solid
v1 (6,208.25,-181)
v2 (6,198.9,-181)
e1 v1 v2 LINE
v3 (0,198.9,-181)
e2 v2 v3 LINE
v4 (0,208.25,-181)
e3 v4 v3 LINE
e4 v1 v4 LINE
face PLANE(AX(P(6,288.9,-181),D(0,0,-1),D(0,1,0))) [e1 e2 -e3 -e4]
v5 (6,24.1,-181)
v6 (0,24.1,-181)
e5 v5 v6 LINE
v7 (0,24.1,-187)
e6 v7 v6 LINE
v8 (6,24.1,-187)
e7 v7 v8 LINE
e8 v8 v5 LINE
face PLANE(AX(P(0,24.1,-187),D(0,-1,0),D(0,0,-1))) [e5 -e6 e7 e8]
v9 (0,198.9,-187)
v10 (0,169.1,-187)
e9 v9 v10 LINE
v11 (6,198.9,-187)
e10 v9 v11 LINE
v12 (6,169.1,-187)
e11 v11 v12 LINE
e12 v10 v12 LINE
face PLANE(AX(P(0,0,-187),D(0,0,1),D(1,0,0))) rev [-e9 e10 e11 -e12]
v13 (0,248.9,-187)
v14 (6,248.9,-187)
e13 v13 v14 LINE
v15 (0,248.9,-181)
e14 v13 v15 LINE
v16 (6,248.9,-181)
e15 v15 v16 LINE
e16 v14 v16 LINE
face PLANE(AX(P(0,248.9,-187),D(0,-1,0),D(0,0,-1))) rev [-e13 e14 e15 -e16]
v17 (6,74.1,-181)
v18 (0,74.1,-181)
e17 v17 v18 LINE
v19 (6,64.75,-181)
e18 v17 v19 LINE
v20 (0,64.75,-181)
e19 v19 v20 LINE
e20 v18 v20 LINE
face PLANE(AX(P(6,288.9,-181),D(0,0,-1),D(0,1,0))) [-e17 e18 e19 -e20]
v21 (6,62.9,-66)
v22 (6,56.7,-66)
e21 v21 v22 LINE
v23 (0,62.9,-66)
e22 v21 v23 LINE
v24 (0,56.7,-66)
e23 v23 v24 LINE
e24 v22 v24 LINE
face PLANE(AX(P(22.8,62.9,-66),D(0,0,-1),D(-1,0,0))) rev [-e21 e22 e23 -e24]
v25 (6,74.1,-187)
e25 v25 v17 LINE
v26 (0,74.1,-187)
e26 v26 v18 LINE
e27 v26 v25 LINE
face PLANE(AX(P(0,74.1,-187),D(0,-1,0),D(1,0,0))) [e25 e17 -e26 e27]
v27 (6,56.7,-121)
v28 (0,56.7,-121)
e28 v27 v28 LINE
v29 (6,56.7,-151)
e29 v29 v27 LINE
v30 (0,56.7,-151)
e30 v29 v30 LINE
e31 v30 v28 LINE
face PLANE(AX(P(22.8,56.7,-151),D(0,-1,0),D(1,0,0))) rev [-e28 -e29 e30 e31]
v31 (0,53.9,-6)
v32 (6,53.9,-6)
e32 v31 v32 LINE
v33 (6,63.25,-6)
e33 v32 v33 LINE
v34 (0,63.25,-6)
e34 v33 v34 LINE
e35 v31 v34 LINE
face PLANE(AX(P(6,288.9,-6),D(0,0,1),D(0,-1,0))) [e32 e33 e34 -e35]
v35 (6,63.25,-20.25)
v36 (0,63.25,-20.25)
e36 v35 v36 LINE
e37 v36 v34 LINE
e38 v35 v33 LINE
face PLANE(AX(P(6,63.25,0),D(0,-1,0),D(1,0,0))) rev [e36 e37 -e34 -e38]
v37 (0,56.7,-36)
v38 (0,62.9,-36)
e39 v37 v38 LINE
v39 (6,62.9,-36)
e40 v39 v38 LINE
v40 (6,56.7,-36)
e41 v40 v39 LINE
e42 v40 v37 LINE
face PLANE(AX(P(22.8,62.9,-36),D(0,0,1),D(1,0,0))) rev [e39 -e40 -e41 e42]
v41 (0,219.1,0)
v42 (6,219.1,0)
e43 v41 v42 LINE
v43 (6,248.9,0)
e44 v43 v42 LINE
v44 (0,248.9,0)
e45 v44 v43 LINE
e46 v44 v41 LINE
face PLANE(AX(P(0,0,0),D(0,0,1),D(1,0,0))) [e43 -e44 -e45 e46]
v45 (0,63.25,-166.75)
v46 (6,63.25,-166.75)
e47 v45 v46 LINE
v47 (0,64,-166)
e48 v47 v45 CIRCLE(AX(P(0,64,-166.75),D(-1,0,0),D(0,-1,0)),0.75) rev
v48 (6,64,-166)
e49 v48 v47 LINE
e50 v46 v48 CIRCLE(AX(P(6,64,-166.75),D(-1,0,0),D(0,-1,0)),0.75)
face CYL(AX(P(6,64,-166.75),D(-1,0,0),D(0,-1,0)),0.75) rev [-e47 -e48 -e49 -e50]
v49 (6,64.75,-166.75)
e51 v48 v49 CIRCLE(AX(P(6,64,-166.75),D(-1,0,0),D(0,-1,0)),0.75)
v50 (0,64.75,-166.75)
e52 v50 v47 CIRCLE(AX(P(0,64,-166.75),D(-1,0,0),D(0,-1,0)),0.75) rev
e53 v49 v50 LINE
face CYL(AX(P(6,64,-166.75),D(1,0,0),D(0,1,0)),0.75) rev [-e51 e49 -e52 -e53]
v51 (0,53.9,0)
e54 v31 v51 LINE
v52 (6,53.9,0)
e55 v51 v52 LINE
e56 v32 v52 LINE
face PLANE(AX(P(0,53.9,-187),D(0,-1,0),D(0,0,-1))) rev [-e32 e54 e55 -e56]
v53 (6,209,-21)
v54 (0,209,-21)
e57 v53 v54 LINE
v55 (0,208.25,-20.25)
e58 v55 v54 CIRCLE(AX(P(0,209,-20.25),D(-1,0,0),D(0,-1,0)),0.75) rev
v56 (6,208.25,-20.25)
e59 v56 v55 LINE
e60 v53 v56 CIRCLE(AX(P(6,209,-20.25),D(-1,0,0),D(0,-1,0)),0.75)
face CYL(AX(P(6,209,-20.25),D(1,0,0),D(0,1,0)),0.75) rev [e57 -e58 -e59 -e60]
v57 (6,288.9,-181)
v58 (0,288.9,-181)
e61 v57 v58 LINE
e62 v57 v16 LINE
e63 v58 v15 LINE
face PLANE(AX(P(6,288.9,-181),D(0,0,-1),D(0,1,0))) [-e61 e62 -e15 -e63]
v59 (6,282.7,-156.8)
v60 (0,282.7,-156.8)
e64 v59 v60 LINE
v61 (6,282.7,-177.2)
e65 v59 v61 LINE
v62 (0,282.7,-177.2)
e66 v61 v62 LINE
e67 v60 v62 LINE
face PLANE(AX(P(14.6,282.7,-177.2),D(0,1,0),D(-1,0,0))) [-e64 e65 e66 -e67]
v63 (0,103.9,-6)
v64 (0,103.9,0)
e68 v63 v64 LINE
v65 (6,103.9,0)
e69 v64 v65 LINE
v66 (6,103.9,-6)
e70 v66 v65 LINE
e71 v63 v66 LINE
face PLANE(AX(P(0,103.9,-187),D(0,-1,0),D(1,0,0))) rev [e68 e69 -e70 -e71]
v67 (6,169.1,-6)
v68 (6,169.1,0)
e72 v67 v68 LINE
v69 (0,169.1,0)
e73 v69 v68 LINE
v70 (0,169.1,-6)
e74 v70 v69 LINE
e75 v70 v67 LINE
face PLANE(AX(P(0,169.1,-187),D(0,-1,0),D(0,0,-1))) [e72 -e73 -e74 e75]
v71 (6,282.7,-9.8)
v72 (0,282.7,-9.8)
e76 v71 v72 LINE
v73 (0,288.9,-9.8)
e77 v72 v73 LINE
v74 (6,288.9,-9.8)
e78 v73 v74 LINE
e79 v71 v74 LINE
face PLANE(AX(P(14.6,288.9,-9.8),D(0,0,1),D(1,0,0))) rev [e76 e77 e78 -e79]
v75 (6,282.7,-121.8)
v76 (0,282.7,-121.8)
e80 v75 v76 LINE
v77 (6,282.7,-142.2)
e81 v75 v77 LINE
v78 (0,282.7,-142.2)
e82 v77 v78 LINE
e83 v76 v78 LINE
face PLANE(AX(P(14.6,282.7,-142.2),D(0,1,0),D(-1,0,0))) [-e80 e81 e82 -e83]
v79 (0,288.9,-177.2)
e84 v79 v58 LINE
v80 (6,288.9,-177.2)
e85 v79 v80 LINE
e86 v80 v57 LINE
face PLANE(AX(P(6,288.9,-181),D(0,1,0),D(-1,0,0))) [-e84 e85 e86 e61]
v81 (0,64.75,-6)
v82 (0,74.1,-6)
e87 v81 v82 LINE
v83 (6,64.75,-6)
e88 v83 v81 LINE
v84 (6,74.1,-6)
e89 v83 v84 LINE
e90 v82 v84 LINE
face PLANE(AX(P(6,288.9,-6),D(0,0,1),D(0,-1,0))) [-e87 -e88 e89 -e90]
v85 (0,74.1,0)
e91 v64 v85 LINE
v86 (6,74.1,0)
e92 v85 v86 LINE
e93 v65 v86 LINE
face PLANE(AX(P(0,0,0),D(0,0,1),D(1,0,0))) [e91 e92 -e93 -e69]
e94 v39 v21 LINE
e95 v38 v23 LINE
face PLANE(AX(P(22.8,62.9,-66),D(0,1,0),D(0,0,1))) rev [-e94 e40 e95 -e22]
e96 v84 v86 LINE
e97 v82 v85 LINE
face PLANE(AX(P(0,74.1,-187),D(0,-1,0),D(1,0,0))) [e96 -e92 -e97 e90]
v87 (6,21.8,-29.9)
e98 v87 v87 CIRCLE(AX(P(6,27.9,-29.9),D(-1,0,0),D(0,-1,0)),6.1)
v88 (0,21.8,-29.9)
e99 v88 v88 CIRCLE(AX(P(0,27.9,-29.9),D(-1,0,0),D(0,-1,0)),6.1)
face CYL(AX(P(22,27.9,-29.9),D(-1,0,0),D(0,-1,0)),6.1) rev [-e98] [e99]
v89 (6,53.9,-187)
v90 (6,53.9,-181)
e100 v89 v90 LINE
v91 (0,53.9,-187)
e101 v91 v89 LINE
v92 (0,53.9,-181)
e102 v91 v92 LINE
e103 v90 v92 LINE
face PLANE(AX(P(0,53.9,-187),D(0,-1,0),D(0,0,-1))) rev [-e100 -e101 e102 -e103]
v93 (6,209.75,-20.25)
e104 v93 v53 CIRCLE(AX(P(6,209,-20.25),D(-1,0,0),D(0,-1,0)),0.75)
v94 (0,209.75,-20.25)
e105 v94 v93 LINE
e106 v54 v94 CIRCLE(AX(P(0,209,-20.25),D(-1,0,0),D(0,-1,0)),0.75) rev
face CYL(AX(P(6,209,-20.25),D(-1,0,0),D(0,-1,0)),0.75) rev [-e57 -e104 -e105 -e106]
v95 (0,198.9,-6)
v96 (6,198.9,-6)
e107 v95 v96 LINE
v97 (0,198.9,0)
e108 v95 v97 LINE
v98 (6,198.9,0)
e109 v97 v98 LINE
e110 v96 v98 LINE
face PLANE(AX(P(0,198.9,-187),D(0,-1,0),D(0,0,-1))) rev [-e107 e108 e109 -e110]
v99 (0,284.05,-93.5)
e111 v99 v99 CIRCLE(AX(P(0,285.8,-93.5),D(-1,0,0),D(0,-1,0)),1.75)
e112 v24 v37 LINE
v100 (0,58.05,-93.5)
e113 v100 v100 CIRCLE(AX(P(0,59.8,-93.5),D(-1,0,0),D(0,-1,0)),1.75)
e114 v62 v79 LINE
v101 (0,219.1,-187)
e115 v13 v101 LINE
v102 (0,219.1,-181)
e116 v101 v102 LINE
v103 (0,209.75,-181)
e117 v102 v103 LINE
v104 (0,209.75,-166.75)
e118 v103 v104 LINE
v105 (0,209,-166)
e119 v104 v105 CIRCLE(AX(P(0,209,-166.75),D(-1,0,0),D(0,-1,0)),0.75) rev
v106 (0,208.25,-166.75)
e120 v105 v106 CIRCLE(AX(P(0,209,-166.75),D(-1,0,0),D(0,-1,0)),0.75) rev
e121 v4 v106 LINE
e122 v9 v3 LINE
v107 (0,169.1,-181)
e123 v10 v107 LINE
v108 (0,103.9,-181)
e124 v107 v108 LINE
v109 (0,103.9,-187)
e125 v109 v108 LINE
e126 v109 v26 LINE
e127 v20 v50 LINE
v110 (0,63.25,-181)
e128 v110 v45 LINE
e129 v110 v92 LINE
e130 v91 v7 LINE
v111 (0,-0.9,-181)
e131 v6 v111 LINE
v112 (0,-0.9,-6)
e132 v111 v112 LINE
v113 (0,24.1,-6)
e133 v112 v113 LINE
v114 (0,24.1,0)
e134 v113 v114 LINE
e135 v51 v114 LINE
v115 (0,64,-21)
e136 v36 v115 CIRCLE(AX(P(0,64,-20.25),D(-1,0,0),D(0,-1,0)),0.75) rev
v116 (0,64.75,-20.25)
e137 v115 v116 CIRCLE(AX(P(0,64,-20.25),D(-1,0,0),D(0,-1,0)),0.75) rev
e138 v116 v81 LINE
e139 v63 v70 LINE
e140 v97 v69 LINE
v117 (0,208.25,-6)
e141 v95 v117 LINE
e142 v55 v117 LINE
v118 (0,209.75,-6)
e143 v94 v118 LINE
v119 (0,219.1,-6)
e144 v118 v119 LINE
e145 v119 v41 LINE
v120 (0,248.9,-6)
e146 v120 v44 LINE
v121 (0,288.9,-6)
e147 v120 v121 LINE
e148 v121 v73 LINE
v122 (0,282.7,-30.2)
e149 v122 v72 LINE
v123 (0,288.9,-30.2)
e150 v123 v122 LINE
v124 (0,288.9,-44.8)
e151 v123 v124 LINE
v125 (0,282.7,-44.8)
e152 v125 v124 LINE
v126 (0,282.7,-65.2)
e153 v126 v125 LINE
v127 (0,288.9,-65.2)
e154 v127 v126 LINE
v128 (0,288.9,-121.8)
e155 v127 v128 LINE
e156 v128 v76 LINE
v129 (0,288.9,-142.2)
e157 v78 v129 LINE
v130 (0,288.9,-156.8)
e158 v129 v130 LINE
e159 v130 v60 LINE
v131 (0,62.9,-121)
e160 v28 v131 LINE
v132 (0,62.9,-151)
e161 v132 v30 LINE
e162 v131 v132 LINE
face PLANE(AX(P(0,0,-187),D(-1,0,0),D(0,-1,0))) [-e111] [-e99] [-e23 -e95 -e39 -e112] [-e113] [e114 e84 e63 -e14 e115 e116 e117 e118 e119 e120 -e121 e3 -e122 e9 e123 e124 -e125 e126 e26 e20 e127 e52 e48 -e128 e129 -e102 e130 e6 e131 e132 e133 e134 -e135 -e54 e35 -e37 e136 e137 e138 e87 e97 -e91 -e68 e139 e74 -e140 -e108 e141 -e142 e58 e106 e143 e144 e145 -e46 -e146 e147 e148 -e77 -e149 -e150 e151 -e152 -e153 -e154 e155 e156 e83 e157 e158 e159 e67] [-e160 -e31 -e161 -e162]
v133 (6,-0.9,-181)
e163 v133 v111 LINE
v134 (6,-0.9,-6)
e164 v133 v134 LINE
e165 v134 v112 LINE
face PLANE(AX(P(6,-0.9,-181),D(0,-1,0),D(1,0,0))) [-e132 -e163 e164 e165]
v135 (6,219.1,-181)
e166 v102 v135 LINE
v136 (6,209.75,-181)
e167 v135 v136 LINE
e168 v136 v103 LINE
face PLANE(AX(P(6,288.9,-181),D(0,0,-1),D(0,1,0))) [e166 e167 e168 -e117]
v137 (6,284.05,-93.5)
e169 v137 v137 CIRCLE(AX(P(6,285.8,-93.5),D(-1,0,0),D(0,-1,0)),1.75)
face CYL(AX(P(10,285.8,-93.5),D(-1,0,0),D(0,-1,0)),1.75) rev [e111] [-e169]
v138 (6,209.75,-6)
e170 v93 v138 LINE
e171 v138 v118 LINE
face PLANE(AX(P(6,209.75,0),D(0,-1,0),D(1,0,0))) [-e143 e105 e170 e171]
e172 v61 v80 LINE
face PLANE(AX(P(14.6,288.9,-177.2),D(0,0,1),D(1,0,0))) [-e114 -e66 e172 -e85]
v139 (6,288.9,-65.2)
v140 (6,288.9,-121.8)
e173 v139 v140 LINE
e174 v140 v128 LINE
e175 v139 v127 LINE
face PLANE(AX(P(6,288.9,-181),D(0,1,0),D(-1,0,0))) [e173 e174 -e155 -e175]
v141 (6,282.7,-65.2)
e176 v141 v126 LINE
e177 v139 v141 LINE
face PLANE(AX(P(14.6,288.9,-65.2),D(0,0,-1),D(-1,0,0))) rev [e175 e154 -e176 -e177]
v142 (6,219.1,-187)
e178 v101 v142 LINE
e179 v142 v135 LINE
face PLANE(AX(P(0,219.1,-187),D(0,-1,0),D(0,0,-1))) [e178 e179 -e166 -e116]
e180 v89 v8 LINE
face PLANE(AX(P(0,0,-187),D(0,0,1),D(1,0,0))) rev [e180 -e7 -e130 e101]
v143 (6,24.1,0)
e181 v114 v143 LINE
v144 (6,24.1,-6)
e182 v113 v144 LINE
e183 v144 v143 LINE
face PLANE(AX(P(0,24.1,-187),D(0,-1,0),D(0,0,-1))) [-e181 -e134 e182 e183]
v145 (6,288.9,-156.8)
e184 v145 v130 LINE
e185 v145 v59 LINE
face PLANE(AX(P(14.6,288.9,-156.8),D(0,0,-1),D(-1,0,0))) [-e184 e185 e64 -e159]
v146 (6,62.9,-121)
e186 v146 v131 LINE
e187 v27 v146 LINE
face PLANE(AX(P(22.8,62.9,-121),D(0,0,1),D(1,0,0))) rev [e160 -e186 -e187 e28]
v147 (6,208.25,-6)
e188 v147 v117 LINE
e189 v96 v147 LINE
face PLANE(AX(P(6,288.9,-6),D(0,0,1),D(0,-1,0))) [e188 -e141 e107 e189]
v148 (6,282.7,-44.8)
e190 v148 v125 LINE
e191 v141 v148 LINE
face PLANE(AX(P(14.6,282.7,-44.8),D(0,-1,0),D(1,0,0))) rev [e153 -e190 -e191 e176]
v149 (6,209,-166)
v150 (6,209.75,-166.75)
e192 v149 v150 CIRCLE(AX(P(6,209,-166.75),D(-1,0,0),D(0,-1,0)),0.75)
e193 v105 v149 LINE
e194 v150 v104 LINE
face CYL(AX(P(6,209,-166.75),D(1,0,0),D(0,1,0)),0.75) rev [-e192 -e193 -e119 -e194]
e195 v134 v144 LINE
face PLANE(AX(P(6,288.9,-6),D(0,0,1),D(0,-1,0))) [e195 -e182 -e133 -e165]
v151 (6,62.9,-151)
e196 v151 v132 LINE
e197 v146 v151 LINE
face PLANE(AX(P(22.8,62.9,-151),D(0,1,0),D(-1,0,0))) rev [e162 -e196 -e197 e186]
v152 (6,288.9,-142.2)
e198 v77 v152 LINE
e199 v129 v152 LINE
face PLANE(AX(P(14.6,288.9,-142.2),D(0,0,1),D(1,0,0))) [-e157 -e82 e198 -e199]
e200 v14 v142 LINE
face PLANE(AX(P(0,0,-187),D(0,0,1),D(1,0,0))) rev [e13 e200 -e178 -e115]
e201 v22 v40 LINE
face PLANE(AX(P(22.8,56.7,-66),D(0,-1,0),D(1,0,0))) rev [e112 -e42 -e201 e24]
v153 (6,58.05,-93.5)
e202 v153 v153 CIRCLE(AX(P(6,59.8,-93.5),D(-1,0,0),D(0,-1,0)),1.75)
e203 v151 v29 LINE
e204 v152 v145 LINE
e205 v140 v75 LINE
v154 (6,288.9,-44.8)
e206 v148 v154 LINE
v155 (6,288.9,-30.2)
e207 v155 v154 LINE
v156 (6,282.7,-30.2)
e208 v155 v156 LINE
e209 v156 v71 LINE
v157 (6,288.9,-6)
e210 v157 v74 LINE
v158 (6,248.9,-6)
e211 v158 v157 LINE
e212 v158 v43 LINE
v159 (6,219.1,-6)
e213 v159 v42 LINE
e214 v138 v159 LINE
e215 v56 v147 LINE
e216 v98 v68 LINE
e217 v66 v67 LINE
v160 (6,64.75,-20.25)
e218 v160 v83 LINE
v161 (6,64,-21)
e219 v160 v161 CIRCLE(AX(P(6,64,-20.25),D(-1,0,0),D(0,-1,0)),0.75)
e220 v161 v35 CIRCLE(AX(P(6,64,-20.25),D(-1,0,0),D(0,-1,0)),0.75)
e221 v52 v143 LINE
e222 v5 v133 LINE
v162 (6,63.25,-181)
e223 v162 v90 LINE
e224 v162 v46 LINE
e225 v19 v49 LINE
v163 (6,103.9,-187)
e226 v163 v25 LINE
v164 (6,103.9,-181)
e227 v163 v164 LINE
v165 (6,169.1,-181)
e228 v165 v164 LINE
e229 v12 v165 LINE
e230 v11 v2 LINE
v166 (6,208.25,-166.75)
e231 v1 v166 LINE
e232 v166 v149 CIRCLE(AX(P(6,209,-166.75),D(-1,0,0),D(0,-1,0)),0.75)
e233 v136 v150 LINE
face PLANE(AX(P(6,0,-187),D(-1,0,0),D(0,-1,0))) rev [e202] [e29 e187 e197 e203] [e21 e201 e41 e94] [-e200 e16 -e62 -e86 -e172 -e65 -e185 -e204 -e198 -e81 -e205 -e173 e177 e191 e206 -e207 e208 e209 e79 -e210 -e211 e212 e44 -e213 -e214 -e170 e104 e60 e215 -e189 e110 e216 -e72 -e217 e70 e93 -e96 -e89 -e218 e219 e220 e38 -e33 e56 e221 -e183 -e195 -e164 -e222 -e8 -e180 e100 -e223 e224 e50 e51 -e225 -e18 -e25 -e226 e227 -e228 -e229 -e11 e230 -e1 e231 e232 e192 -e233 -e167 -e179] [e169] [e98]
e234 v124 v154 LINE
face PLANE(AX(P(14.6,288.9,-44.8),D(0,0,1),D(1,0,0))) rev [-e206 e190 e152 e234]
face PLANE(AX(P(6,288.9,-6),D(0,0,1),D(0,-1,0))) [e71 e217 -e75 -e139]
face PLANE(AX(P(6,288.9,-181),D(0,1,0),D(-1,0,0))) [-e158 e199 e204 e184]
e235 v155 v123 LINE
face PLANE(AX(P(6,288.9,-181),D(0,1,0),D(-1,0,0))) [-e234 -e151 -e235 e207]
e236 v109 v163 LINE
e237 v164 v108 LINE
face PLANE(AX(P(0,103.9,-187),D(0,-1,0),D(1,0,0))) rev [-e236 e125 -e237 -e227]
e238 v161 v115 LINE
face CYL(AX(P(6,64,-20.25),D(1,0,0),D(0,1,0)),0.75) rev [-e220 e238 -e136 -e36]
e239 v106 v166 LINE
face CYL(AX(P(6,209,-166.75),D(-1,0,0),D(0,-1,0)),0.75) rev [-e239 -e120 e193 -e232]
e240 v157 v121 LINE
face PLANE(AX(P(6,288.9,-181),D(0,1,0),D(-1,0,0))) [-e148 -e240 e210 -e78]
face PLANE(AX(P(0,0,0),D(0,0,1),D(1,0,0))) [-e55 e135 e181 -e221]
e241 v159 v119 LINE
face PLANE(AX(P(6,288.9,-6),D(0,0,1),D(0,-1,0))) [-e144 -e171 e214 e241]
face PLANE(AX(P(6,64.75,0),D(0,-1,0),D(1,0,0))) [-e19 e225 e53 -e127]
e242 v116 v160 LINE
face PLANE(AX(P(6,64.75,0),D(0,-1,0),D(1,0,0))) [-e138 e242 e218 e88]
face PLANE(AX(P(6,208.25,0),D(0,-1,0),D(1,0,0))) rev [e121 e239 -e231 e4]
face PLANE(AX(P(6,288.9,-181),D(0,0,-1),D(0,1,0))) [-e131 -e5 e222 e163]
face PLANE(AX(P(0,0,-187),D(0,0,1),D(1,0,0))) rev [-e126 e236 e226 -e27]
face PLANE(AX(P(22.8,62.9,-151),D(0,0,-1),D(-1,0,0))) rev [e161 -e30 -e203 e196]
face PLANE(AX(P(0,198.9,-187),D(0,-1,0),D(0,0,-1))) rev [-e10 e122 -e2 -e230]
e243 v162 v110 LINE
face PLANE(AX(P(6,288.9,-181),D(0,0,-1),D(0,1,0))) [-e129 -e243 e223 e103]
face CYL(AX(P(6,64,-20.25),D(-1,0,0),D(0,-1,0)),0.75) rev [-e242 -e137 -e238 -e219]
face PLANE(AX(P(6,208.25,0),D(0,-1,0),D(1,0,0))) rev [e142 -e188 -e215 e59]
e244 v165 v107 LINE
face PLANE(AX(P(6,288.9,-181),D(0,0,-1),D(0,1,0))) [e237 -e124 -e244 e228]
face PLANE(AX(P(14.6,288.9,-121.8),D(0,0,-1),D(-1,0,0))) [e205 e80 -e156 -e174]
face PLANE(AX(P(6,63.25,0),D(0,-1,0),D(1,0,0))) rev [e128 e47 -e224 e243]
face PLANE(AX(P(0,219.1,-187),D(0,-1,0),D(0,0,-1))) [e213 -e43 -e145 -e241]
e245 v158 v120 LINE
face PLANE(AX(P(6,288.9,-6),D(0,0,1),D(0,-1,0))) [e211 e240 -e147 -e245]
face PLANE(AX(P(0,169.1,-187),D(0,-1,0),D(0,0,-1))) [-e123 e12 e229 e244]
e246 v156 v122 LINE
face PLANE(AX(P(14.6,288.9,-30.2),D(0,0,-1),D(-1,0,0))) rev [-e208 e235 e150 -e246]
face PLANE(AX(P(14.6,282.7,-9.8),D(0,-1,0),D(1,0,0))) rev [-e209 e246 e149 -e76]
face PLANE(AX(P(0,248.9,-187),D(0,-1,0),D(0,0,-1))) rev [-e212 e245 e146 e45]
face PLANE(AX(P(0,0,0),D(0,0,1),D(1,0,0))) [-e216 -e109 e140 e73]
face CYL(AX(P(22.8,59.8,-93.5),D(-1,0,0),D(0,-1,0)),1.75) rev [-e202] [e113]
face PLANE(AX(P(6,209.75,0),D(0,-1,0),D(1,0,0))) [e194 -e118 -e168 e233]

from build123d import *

# Parameters (mm, degrees)
ESBO_O1_W                  = 6
ESBO_O1_H                  = 29.8
RESSALTO_EXTRUS_O3_DEPTH   = 187
RESSALTO_EXTRUS_O3_2_DEPTH = 187
RESSALTO_EXTRUS_O3_3_DEPTH = 187
RESSALTO_EXTRUS_O3_4_DEPTH = 187
ESBO_O2_W                  = 175
ESBO_O2_H                  = 289.8
RESSALTO_EXTRUS_O4_DEPTH   = 6
ESBO_O3_W                  = 15
ESBO_O3_H                  = 1.5
CORTE_EXTRUS_O1_DEPTH      = 6
ESBO_O5_R                  = 1.75
ESBO_O5_W                  = 30
ESBO_O5_H                  = 6.2
CORTE_EXTRUS_O3_DEPTH      = 22.8
ESBO_O6_W                  = 20.4
ESBO_O6_H                  = 6.2
CORTE_EXTRUS_O4_DEPTH      = 14.6
FILETE1_R                  = 0.75
CORTE_EXTRUS_O5_DEPTH      = 10
ESBO_O8_R                  = 6.1
CORTE_EXTRUS_O6_DEPTH      = 22


with BuildPart() as part:
    # Esboço1 → Ressalto-extrusão3 (new body)
    with BuildSketch(Plane.XY):
        with Locations((3, 39)):
            Rectangle(ESBO_O1_W, ESBO_O1_H)
    extrude(amount=-RESSALTO_EXTRUS_O3_DEPTH)



with BuildPart() as body_2:
    # Esboço1 → Ressalto-extrus_o3 2 (new body)
    with BuildSketch(Plane.XY):
        with Locations((3, 89)):
            Rectangle(ESBO_O1_W, ESBO_O1_H)
    extrude(amount=-RESSALTO_EXTRUS_O3_2_DEPTH)


with BuildPart() as body_3:
    # Esboço1 → Ressalto-extrus_o3 3 (new body)
    with BuildSketch(Plane.XY):
        with Locations((3, 184)):
            Rectangle(ESBO_O1_W, ESBO_O1_H)
    extrude(amount=-RESSALTO_EXTRUS_O3_3_DEPTH)


with BuildPart() as body_4:
    # Esboço1 → Ressalto-extrus_o3 4 (new body)
    with BuildSketch(Plane.XY):
        with Locations((3, 234)):
            Rectangle(ESBO_O1_W, ESBO_O1_H)
    extrude(amount=-RESSALTO_EXTRUS_O3_4_DEPTH)


with BuildPart() as part_1:
    add(part.part)

    add(body_2.part)  # Ressalto-extrusão4 merges body 2

    add(body_3.part)  # Ressalto-extrusão4 merges body 3

    add(body_4.part)  # Ressalto-extrusão4 merges body 4
    # Esboço2 → Ressalto-extrusão4 (add)
    with BuildSketch(Plane.ZY):
        with Locations((-93.5, 144)):
            Rectangle(ESBO_O2_W, ESBO_O2_H)
    extrude(amount=-RESSALTO_EXTRUS_O4_DEPTH)

    # Esboço3 → Corte-extrusão1 (cut)
    with BuildSketch(Plane.ZY):
        with Locations((-173.5, 64)):
            Rectangle(ESBO_O3_W, ESBO_O3_H)
        with Locations((-13.5, 64)):
            Rectangle(ESBO_O3_W, ESBO_O3_H)
        with Locations((-13.5, 209)):
            Rectangle(ESBO_O3_W, ESBO_O3_H)
        with Locations((-173.5, 209)):
            Rectangle(ESBO_O3_W, ESBO_O3_H)
    extrude(amount=-CORTE_EXTRUS_O1_DEPTH, mode=Mode.SUBTRACT)

    # Esboço5 → Corte-extrusão3 (cut)
    with BuildSketch(Plane.ZY):
        with Locations(Location((-93.5, 59.8, 0), (0, 0, 270))):
            Circle(ESBO_O5_R)
        with Locations((-136, 59.8)):
            Rectangle(ESBO_O5_W, ESBO_O5_H)
        with Locations((-51, 59.8)):
            Rectangle(ESBO_O5_W, ESBO_O5_H)
    extrude(amount=-CORTE_EXTRUS_O3_DEPTH, mode=Mode.SUBTRACT)

    # Esboço6 → Corte-extrusão4 (cut)
    with BuildSketch(Plane.ZY):
        with Locations((-20, 285.8)):
            Rectangle(ESBO_O6_W, ESBO_O6_H)
        with Locations((-55, 285.8)):
            Rectangle(ESBO_O6_W, ESBO_O6_H)
    corte_extrus_o4 = extrude(amount=-CORTE_EXTRUS_O4_DEPTH, mode=Mode.SUBTRACT)

    # Espelhar1: Corte-extrusão4 across plane
    add(corte_extrus_o4.mirror(Plane.XY.offset(-93.5)), mode=Mode.SUBTRACT)

    # Filete1
    filete1_edges = [part_1.edges().sort_by_distance(p)[0] for p in [
        (3, 64.75, -166),
        (3, 63.25, -166),
        (3, 63.25, -21),
        (3, 64.75, -21),
        (3, 208.25, -21),
        (3, 209.75, -21),
        (3, 208.25, -166),
        (3, 209.75, -166),
    ]]
    fillet(filete1_edges, radius=FILETE1_R - 0.0001)  # a hair under: the kernel refuses the full size

    # Esboço7 → Corte-extrusão5 (cut)
    with BuildSketch(Plane.ZY):
        with BuildLine():
            ThreePointArc((-91.75, 285.8), (-93.404579917, 287.547396637), (-95.239594295, 285.990556265))
            Line((-95.239594295, 285.990556265), (-91.760405705, 285.609443735))
            ThreePointArc((-91.760405705, 285.609443735), (-91.752603363, 285.704579917), (-91.75, 285.8))
        make_face()
        with BuildLine():
            Line((-91.760405705, 285.609443735), (-95.239594295, 285.990556265))
            ThreePointArc((-95.239594295, 285.990556265), (-93.690556265, 284.060405705), (-91.760405705, 285.609443735))
        make_face()
    extrude(amount=-CORTE_EXTRUS_O5_DEPTH, mode=Mode.SUBTRACT)

    # Esboço8 → Corte-extrusão6 (cut)
    with BuildSketch(Plane.ZY):
        with Locations(Location((-29.9, 27.9, 0), (0, 0, 270))):
            Circle(ESBO_O8_R)
    extrude(amount=-CORTE_EXTRUS_O6_DEPTH, mode=Mode.SUBTRACT)


solid = part_1.part
